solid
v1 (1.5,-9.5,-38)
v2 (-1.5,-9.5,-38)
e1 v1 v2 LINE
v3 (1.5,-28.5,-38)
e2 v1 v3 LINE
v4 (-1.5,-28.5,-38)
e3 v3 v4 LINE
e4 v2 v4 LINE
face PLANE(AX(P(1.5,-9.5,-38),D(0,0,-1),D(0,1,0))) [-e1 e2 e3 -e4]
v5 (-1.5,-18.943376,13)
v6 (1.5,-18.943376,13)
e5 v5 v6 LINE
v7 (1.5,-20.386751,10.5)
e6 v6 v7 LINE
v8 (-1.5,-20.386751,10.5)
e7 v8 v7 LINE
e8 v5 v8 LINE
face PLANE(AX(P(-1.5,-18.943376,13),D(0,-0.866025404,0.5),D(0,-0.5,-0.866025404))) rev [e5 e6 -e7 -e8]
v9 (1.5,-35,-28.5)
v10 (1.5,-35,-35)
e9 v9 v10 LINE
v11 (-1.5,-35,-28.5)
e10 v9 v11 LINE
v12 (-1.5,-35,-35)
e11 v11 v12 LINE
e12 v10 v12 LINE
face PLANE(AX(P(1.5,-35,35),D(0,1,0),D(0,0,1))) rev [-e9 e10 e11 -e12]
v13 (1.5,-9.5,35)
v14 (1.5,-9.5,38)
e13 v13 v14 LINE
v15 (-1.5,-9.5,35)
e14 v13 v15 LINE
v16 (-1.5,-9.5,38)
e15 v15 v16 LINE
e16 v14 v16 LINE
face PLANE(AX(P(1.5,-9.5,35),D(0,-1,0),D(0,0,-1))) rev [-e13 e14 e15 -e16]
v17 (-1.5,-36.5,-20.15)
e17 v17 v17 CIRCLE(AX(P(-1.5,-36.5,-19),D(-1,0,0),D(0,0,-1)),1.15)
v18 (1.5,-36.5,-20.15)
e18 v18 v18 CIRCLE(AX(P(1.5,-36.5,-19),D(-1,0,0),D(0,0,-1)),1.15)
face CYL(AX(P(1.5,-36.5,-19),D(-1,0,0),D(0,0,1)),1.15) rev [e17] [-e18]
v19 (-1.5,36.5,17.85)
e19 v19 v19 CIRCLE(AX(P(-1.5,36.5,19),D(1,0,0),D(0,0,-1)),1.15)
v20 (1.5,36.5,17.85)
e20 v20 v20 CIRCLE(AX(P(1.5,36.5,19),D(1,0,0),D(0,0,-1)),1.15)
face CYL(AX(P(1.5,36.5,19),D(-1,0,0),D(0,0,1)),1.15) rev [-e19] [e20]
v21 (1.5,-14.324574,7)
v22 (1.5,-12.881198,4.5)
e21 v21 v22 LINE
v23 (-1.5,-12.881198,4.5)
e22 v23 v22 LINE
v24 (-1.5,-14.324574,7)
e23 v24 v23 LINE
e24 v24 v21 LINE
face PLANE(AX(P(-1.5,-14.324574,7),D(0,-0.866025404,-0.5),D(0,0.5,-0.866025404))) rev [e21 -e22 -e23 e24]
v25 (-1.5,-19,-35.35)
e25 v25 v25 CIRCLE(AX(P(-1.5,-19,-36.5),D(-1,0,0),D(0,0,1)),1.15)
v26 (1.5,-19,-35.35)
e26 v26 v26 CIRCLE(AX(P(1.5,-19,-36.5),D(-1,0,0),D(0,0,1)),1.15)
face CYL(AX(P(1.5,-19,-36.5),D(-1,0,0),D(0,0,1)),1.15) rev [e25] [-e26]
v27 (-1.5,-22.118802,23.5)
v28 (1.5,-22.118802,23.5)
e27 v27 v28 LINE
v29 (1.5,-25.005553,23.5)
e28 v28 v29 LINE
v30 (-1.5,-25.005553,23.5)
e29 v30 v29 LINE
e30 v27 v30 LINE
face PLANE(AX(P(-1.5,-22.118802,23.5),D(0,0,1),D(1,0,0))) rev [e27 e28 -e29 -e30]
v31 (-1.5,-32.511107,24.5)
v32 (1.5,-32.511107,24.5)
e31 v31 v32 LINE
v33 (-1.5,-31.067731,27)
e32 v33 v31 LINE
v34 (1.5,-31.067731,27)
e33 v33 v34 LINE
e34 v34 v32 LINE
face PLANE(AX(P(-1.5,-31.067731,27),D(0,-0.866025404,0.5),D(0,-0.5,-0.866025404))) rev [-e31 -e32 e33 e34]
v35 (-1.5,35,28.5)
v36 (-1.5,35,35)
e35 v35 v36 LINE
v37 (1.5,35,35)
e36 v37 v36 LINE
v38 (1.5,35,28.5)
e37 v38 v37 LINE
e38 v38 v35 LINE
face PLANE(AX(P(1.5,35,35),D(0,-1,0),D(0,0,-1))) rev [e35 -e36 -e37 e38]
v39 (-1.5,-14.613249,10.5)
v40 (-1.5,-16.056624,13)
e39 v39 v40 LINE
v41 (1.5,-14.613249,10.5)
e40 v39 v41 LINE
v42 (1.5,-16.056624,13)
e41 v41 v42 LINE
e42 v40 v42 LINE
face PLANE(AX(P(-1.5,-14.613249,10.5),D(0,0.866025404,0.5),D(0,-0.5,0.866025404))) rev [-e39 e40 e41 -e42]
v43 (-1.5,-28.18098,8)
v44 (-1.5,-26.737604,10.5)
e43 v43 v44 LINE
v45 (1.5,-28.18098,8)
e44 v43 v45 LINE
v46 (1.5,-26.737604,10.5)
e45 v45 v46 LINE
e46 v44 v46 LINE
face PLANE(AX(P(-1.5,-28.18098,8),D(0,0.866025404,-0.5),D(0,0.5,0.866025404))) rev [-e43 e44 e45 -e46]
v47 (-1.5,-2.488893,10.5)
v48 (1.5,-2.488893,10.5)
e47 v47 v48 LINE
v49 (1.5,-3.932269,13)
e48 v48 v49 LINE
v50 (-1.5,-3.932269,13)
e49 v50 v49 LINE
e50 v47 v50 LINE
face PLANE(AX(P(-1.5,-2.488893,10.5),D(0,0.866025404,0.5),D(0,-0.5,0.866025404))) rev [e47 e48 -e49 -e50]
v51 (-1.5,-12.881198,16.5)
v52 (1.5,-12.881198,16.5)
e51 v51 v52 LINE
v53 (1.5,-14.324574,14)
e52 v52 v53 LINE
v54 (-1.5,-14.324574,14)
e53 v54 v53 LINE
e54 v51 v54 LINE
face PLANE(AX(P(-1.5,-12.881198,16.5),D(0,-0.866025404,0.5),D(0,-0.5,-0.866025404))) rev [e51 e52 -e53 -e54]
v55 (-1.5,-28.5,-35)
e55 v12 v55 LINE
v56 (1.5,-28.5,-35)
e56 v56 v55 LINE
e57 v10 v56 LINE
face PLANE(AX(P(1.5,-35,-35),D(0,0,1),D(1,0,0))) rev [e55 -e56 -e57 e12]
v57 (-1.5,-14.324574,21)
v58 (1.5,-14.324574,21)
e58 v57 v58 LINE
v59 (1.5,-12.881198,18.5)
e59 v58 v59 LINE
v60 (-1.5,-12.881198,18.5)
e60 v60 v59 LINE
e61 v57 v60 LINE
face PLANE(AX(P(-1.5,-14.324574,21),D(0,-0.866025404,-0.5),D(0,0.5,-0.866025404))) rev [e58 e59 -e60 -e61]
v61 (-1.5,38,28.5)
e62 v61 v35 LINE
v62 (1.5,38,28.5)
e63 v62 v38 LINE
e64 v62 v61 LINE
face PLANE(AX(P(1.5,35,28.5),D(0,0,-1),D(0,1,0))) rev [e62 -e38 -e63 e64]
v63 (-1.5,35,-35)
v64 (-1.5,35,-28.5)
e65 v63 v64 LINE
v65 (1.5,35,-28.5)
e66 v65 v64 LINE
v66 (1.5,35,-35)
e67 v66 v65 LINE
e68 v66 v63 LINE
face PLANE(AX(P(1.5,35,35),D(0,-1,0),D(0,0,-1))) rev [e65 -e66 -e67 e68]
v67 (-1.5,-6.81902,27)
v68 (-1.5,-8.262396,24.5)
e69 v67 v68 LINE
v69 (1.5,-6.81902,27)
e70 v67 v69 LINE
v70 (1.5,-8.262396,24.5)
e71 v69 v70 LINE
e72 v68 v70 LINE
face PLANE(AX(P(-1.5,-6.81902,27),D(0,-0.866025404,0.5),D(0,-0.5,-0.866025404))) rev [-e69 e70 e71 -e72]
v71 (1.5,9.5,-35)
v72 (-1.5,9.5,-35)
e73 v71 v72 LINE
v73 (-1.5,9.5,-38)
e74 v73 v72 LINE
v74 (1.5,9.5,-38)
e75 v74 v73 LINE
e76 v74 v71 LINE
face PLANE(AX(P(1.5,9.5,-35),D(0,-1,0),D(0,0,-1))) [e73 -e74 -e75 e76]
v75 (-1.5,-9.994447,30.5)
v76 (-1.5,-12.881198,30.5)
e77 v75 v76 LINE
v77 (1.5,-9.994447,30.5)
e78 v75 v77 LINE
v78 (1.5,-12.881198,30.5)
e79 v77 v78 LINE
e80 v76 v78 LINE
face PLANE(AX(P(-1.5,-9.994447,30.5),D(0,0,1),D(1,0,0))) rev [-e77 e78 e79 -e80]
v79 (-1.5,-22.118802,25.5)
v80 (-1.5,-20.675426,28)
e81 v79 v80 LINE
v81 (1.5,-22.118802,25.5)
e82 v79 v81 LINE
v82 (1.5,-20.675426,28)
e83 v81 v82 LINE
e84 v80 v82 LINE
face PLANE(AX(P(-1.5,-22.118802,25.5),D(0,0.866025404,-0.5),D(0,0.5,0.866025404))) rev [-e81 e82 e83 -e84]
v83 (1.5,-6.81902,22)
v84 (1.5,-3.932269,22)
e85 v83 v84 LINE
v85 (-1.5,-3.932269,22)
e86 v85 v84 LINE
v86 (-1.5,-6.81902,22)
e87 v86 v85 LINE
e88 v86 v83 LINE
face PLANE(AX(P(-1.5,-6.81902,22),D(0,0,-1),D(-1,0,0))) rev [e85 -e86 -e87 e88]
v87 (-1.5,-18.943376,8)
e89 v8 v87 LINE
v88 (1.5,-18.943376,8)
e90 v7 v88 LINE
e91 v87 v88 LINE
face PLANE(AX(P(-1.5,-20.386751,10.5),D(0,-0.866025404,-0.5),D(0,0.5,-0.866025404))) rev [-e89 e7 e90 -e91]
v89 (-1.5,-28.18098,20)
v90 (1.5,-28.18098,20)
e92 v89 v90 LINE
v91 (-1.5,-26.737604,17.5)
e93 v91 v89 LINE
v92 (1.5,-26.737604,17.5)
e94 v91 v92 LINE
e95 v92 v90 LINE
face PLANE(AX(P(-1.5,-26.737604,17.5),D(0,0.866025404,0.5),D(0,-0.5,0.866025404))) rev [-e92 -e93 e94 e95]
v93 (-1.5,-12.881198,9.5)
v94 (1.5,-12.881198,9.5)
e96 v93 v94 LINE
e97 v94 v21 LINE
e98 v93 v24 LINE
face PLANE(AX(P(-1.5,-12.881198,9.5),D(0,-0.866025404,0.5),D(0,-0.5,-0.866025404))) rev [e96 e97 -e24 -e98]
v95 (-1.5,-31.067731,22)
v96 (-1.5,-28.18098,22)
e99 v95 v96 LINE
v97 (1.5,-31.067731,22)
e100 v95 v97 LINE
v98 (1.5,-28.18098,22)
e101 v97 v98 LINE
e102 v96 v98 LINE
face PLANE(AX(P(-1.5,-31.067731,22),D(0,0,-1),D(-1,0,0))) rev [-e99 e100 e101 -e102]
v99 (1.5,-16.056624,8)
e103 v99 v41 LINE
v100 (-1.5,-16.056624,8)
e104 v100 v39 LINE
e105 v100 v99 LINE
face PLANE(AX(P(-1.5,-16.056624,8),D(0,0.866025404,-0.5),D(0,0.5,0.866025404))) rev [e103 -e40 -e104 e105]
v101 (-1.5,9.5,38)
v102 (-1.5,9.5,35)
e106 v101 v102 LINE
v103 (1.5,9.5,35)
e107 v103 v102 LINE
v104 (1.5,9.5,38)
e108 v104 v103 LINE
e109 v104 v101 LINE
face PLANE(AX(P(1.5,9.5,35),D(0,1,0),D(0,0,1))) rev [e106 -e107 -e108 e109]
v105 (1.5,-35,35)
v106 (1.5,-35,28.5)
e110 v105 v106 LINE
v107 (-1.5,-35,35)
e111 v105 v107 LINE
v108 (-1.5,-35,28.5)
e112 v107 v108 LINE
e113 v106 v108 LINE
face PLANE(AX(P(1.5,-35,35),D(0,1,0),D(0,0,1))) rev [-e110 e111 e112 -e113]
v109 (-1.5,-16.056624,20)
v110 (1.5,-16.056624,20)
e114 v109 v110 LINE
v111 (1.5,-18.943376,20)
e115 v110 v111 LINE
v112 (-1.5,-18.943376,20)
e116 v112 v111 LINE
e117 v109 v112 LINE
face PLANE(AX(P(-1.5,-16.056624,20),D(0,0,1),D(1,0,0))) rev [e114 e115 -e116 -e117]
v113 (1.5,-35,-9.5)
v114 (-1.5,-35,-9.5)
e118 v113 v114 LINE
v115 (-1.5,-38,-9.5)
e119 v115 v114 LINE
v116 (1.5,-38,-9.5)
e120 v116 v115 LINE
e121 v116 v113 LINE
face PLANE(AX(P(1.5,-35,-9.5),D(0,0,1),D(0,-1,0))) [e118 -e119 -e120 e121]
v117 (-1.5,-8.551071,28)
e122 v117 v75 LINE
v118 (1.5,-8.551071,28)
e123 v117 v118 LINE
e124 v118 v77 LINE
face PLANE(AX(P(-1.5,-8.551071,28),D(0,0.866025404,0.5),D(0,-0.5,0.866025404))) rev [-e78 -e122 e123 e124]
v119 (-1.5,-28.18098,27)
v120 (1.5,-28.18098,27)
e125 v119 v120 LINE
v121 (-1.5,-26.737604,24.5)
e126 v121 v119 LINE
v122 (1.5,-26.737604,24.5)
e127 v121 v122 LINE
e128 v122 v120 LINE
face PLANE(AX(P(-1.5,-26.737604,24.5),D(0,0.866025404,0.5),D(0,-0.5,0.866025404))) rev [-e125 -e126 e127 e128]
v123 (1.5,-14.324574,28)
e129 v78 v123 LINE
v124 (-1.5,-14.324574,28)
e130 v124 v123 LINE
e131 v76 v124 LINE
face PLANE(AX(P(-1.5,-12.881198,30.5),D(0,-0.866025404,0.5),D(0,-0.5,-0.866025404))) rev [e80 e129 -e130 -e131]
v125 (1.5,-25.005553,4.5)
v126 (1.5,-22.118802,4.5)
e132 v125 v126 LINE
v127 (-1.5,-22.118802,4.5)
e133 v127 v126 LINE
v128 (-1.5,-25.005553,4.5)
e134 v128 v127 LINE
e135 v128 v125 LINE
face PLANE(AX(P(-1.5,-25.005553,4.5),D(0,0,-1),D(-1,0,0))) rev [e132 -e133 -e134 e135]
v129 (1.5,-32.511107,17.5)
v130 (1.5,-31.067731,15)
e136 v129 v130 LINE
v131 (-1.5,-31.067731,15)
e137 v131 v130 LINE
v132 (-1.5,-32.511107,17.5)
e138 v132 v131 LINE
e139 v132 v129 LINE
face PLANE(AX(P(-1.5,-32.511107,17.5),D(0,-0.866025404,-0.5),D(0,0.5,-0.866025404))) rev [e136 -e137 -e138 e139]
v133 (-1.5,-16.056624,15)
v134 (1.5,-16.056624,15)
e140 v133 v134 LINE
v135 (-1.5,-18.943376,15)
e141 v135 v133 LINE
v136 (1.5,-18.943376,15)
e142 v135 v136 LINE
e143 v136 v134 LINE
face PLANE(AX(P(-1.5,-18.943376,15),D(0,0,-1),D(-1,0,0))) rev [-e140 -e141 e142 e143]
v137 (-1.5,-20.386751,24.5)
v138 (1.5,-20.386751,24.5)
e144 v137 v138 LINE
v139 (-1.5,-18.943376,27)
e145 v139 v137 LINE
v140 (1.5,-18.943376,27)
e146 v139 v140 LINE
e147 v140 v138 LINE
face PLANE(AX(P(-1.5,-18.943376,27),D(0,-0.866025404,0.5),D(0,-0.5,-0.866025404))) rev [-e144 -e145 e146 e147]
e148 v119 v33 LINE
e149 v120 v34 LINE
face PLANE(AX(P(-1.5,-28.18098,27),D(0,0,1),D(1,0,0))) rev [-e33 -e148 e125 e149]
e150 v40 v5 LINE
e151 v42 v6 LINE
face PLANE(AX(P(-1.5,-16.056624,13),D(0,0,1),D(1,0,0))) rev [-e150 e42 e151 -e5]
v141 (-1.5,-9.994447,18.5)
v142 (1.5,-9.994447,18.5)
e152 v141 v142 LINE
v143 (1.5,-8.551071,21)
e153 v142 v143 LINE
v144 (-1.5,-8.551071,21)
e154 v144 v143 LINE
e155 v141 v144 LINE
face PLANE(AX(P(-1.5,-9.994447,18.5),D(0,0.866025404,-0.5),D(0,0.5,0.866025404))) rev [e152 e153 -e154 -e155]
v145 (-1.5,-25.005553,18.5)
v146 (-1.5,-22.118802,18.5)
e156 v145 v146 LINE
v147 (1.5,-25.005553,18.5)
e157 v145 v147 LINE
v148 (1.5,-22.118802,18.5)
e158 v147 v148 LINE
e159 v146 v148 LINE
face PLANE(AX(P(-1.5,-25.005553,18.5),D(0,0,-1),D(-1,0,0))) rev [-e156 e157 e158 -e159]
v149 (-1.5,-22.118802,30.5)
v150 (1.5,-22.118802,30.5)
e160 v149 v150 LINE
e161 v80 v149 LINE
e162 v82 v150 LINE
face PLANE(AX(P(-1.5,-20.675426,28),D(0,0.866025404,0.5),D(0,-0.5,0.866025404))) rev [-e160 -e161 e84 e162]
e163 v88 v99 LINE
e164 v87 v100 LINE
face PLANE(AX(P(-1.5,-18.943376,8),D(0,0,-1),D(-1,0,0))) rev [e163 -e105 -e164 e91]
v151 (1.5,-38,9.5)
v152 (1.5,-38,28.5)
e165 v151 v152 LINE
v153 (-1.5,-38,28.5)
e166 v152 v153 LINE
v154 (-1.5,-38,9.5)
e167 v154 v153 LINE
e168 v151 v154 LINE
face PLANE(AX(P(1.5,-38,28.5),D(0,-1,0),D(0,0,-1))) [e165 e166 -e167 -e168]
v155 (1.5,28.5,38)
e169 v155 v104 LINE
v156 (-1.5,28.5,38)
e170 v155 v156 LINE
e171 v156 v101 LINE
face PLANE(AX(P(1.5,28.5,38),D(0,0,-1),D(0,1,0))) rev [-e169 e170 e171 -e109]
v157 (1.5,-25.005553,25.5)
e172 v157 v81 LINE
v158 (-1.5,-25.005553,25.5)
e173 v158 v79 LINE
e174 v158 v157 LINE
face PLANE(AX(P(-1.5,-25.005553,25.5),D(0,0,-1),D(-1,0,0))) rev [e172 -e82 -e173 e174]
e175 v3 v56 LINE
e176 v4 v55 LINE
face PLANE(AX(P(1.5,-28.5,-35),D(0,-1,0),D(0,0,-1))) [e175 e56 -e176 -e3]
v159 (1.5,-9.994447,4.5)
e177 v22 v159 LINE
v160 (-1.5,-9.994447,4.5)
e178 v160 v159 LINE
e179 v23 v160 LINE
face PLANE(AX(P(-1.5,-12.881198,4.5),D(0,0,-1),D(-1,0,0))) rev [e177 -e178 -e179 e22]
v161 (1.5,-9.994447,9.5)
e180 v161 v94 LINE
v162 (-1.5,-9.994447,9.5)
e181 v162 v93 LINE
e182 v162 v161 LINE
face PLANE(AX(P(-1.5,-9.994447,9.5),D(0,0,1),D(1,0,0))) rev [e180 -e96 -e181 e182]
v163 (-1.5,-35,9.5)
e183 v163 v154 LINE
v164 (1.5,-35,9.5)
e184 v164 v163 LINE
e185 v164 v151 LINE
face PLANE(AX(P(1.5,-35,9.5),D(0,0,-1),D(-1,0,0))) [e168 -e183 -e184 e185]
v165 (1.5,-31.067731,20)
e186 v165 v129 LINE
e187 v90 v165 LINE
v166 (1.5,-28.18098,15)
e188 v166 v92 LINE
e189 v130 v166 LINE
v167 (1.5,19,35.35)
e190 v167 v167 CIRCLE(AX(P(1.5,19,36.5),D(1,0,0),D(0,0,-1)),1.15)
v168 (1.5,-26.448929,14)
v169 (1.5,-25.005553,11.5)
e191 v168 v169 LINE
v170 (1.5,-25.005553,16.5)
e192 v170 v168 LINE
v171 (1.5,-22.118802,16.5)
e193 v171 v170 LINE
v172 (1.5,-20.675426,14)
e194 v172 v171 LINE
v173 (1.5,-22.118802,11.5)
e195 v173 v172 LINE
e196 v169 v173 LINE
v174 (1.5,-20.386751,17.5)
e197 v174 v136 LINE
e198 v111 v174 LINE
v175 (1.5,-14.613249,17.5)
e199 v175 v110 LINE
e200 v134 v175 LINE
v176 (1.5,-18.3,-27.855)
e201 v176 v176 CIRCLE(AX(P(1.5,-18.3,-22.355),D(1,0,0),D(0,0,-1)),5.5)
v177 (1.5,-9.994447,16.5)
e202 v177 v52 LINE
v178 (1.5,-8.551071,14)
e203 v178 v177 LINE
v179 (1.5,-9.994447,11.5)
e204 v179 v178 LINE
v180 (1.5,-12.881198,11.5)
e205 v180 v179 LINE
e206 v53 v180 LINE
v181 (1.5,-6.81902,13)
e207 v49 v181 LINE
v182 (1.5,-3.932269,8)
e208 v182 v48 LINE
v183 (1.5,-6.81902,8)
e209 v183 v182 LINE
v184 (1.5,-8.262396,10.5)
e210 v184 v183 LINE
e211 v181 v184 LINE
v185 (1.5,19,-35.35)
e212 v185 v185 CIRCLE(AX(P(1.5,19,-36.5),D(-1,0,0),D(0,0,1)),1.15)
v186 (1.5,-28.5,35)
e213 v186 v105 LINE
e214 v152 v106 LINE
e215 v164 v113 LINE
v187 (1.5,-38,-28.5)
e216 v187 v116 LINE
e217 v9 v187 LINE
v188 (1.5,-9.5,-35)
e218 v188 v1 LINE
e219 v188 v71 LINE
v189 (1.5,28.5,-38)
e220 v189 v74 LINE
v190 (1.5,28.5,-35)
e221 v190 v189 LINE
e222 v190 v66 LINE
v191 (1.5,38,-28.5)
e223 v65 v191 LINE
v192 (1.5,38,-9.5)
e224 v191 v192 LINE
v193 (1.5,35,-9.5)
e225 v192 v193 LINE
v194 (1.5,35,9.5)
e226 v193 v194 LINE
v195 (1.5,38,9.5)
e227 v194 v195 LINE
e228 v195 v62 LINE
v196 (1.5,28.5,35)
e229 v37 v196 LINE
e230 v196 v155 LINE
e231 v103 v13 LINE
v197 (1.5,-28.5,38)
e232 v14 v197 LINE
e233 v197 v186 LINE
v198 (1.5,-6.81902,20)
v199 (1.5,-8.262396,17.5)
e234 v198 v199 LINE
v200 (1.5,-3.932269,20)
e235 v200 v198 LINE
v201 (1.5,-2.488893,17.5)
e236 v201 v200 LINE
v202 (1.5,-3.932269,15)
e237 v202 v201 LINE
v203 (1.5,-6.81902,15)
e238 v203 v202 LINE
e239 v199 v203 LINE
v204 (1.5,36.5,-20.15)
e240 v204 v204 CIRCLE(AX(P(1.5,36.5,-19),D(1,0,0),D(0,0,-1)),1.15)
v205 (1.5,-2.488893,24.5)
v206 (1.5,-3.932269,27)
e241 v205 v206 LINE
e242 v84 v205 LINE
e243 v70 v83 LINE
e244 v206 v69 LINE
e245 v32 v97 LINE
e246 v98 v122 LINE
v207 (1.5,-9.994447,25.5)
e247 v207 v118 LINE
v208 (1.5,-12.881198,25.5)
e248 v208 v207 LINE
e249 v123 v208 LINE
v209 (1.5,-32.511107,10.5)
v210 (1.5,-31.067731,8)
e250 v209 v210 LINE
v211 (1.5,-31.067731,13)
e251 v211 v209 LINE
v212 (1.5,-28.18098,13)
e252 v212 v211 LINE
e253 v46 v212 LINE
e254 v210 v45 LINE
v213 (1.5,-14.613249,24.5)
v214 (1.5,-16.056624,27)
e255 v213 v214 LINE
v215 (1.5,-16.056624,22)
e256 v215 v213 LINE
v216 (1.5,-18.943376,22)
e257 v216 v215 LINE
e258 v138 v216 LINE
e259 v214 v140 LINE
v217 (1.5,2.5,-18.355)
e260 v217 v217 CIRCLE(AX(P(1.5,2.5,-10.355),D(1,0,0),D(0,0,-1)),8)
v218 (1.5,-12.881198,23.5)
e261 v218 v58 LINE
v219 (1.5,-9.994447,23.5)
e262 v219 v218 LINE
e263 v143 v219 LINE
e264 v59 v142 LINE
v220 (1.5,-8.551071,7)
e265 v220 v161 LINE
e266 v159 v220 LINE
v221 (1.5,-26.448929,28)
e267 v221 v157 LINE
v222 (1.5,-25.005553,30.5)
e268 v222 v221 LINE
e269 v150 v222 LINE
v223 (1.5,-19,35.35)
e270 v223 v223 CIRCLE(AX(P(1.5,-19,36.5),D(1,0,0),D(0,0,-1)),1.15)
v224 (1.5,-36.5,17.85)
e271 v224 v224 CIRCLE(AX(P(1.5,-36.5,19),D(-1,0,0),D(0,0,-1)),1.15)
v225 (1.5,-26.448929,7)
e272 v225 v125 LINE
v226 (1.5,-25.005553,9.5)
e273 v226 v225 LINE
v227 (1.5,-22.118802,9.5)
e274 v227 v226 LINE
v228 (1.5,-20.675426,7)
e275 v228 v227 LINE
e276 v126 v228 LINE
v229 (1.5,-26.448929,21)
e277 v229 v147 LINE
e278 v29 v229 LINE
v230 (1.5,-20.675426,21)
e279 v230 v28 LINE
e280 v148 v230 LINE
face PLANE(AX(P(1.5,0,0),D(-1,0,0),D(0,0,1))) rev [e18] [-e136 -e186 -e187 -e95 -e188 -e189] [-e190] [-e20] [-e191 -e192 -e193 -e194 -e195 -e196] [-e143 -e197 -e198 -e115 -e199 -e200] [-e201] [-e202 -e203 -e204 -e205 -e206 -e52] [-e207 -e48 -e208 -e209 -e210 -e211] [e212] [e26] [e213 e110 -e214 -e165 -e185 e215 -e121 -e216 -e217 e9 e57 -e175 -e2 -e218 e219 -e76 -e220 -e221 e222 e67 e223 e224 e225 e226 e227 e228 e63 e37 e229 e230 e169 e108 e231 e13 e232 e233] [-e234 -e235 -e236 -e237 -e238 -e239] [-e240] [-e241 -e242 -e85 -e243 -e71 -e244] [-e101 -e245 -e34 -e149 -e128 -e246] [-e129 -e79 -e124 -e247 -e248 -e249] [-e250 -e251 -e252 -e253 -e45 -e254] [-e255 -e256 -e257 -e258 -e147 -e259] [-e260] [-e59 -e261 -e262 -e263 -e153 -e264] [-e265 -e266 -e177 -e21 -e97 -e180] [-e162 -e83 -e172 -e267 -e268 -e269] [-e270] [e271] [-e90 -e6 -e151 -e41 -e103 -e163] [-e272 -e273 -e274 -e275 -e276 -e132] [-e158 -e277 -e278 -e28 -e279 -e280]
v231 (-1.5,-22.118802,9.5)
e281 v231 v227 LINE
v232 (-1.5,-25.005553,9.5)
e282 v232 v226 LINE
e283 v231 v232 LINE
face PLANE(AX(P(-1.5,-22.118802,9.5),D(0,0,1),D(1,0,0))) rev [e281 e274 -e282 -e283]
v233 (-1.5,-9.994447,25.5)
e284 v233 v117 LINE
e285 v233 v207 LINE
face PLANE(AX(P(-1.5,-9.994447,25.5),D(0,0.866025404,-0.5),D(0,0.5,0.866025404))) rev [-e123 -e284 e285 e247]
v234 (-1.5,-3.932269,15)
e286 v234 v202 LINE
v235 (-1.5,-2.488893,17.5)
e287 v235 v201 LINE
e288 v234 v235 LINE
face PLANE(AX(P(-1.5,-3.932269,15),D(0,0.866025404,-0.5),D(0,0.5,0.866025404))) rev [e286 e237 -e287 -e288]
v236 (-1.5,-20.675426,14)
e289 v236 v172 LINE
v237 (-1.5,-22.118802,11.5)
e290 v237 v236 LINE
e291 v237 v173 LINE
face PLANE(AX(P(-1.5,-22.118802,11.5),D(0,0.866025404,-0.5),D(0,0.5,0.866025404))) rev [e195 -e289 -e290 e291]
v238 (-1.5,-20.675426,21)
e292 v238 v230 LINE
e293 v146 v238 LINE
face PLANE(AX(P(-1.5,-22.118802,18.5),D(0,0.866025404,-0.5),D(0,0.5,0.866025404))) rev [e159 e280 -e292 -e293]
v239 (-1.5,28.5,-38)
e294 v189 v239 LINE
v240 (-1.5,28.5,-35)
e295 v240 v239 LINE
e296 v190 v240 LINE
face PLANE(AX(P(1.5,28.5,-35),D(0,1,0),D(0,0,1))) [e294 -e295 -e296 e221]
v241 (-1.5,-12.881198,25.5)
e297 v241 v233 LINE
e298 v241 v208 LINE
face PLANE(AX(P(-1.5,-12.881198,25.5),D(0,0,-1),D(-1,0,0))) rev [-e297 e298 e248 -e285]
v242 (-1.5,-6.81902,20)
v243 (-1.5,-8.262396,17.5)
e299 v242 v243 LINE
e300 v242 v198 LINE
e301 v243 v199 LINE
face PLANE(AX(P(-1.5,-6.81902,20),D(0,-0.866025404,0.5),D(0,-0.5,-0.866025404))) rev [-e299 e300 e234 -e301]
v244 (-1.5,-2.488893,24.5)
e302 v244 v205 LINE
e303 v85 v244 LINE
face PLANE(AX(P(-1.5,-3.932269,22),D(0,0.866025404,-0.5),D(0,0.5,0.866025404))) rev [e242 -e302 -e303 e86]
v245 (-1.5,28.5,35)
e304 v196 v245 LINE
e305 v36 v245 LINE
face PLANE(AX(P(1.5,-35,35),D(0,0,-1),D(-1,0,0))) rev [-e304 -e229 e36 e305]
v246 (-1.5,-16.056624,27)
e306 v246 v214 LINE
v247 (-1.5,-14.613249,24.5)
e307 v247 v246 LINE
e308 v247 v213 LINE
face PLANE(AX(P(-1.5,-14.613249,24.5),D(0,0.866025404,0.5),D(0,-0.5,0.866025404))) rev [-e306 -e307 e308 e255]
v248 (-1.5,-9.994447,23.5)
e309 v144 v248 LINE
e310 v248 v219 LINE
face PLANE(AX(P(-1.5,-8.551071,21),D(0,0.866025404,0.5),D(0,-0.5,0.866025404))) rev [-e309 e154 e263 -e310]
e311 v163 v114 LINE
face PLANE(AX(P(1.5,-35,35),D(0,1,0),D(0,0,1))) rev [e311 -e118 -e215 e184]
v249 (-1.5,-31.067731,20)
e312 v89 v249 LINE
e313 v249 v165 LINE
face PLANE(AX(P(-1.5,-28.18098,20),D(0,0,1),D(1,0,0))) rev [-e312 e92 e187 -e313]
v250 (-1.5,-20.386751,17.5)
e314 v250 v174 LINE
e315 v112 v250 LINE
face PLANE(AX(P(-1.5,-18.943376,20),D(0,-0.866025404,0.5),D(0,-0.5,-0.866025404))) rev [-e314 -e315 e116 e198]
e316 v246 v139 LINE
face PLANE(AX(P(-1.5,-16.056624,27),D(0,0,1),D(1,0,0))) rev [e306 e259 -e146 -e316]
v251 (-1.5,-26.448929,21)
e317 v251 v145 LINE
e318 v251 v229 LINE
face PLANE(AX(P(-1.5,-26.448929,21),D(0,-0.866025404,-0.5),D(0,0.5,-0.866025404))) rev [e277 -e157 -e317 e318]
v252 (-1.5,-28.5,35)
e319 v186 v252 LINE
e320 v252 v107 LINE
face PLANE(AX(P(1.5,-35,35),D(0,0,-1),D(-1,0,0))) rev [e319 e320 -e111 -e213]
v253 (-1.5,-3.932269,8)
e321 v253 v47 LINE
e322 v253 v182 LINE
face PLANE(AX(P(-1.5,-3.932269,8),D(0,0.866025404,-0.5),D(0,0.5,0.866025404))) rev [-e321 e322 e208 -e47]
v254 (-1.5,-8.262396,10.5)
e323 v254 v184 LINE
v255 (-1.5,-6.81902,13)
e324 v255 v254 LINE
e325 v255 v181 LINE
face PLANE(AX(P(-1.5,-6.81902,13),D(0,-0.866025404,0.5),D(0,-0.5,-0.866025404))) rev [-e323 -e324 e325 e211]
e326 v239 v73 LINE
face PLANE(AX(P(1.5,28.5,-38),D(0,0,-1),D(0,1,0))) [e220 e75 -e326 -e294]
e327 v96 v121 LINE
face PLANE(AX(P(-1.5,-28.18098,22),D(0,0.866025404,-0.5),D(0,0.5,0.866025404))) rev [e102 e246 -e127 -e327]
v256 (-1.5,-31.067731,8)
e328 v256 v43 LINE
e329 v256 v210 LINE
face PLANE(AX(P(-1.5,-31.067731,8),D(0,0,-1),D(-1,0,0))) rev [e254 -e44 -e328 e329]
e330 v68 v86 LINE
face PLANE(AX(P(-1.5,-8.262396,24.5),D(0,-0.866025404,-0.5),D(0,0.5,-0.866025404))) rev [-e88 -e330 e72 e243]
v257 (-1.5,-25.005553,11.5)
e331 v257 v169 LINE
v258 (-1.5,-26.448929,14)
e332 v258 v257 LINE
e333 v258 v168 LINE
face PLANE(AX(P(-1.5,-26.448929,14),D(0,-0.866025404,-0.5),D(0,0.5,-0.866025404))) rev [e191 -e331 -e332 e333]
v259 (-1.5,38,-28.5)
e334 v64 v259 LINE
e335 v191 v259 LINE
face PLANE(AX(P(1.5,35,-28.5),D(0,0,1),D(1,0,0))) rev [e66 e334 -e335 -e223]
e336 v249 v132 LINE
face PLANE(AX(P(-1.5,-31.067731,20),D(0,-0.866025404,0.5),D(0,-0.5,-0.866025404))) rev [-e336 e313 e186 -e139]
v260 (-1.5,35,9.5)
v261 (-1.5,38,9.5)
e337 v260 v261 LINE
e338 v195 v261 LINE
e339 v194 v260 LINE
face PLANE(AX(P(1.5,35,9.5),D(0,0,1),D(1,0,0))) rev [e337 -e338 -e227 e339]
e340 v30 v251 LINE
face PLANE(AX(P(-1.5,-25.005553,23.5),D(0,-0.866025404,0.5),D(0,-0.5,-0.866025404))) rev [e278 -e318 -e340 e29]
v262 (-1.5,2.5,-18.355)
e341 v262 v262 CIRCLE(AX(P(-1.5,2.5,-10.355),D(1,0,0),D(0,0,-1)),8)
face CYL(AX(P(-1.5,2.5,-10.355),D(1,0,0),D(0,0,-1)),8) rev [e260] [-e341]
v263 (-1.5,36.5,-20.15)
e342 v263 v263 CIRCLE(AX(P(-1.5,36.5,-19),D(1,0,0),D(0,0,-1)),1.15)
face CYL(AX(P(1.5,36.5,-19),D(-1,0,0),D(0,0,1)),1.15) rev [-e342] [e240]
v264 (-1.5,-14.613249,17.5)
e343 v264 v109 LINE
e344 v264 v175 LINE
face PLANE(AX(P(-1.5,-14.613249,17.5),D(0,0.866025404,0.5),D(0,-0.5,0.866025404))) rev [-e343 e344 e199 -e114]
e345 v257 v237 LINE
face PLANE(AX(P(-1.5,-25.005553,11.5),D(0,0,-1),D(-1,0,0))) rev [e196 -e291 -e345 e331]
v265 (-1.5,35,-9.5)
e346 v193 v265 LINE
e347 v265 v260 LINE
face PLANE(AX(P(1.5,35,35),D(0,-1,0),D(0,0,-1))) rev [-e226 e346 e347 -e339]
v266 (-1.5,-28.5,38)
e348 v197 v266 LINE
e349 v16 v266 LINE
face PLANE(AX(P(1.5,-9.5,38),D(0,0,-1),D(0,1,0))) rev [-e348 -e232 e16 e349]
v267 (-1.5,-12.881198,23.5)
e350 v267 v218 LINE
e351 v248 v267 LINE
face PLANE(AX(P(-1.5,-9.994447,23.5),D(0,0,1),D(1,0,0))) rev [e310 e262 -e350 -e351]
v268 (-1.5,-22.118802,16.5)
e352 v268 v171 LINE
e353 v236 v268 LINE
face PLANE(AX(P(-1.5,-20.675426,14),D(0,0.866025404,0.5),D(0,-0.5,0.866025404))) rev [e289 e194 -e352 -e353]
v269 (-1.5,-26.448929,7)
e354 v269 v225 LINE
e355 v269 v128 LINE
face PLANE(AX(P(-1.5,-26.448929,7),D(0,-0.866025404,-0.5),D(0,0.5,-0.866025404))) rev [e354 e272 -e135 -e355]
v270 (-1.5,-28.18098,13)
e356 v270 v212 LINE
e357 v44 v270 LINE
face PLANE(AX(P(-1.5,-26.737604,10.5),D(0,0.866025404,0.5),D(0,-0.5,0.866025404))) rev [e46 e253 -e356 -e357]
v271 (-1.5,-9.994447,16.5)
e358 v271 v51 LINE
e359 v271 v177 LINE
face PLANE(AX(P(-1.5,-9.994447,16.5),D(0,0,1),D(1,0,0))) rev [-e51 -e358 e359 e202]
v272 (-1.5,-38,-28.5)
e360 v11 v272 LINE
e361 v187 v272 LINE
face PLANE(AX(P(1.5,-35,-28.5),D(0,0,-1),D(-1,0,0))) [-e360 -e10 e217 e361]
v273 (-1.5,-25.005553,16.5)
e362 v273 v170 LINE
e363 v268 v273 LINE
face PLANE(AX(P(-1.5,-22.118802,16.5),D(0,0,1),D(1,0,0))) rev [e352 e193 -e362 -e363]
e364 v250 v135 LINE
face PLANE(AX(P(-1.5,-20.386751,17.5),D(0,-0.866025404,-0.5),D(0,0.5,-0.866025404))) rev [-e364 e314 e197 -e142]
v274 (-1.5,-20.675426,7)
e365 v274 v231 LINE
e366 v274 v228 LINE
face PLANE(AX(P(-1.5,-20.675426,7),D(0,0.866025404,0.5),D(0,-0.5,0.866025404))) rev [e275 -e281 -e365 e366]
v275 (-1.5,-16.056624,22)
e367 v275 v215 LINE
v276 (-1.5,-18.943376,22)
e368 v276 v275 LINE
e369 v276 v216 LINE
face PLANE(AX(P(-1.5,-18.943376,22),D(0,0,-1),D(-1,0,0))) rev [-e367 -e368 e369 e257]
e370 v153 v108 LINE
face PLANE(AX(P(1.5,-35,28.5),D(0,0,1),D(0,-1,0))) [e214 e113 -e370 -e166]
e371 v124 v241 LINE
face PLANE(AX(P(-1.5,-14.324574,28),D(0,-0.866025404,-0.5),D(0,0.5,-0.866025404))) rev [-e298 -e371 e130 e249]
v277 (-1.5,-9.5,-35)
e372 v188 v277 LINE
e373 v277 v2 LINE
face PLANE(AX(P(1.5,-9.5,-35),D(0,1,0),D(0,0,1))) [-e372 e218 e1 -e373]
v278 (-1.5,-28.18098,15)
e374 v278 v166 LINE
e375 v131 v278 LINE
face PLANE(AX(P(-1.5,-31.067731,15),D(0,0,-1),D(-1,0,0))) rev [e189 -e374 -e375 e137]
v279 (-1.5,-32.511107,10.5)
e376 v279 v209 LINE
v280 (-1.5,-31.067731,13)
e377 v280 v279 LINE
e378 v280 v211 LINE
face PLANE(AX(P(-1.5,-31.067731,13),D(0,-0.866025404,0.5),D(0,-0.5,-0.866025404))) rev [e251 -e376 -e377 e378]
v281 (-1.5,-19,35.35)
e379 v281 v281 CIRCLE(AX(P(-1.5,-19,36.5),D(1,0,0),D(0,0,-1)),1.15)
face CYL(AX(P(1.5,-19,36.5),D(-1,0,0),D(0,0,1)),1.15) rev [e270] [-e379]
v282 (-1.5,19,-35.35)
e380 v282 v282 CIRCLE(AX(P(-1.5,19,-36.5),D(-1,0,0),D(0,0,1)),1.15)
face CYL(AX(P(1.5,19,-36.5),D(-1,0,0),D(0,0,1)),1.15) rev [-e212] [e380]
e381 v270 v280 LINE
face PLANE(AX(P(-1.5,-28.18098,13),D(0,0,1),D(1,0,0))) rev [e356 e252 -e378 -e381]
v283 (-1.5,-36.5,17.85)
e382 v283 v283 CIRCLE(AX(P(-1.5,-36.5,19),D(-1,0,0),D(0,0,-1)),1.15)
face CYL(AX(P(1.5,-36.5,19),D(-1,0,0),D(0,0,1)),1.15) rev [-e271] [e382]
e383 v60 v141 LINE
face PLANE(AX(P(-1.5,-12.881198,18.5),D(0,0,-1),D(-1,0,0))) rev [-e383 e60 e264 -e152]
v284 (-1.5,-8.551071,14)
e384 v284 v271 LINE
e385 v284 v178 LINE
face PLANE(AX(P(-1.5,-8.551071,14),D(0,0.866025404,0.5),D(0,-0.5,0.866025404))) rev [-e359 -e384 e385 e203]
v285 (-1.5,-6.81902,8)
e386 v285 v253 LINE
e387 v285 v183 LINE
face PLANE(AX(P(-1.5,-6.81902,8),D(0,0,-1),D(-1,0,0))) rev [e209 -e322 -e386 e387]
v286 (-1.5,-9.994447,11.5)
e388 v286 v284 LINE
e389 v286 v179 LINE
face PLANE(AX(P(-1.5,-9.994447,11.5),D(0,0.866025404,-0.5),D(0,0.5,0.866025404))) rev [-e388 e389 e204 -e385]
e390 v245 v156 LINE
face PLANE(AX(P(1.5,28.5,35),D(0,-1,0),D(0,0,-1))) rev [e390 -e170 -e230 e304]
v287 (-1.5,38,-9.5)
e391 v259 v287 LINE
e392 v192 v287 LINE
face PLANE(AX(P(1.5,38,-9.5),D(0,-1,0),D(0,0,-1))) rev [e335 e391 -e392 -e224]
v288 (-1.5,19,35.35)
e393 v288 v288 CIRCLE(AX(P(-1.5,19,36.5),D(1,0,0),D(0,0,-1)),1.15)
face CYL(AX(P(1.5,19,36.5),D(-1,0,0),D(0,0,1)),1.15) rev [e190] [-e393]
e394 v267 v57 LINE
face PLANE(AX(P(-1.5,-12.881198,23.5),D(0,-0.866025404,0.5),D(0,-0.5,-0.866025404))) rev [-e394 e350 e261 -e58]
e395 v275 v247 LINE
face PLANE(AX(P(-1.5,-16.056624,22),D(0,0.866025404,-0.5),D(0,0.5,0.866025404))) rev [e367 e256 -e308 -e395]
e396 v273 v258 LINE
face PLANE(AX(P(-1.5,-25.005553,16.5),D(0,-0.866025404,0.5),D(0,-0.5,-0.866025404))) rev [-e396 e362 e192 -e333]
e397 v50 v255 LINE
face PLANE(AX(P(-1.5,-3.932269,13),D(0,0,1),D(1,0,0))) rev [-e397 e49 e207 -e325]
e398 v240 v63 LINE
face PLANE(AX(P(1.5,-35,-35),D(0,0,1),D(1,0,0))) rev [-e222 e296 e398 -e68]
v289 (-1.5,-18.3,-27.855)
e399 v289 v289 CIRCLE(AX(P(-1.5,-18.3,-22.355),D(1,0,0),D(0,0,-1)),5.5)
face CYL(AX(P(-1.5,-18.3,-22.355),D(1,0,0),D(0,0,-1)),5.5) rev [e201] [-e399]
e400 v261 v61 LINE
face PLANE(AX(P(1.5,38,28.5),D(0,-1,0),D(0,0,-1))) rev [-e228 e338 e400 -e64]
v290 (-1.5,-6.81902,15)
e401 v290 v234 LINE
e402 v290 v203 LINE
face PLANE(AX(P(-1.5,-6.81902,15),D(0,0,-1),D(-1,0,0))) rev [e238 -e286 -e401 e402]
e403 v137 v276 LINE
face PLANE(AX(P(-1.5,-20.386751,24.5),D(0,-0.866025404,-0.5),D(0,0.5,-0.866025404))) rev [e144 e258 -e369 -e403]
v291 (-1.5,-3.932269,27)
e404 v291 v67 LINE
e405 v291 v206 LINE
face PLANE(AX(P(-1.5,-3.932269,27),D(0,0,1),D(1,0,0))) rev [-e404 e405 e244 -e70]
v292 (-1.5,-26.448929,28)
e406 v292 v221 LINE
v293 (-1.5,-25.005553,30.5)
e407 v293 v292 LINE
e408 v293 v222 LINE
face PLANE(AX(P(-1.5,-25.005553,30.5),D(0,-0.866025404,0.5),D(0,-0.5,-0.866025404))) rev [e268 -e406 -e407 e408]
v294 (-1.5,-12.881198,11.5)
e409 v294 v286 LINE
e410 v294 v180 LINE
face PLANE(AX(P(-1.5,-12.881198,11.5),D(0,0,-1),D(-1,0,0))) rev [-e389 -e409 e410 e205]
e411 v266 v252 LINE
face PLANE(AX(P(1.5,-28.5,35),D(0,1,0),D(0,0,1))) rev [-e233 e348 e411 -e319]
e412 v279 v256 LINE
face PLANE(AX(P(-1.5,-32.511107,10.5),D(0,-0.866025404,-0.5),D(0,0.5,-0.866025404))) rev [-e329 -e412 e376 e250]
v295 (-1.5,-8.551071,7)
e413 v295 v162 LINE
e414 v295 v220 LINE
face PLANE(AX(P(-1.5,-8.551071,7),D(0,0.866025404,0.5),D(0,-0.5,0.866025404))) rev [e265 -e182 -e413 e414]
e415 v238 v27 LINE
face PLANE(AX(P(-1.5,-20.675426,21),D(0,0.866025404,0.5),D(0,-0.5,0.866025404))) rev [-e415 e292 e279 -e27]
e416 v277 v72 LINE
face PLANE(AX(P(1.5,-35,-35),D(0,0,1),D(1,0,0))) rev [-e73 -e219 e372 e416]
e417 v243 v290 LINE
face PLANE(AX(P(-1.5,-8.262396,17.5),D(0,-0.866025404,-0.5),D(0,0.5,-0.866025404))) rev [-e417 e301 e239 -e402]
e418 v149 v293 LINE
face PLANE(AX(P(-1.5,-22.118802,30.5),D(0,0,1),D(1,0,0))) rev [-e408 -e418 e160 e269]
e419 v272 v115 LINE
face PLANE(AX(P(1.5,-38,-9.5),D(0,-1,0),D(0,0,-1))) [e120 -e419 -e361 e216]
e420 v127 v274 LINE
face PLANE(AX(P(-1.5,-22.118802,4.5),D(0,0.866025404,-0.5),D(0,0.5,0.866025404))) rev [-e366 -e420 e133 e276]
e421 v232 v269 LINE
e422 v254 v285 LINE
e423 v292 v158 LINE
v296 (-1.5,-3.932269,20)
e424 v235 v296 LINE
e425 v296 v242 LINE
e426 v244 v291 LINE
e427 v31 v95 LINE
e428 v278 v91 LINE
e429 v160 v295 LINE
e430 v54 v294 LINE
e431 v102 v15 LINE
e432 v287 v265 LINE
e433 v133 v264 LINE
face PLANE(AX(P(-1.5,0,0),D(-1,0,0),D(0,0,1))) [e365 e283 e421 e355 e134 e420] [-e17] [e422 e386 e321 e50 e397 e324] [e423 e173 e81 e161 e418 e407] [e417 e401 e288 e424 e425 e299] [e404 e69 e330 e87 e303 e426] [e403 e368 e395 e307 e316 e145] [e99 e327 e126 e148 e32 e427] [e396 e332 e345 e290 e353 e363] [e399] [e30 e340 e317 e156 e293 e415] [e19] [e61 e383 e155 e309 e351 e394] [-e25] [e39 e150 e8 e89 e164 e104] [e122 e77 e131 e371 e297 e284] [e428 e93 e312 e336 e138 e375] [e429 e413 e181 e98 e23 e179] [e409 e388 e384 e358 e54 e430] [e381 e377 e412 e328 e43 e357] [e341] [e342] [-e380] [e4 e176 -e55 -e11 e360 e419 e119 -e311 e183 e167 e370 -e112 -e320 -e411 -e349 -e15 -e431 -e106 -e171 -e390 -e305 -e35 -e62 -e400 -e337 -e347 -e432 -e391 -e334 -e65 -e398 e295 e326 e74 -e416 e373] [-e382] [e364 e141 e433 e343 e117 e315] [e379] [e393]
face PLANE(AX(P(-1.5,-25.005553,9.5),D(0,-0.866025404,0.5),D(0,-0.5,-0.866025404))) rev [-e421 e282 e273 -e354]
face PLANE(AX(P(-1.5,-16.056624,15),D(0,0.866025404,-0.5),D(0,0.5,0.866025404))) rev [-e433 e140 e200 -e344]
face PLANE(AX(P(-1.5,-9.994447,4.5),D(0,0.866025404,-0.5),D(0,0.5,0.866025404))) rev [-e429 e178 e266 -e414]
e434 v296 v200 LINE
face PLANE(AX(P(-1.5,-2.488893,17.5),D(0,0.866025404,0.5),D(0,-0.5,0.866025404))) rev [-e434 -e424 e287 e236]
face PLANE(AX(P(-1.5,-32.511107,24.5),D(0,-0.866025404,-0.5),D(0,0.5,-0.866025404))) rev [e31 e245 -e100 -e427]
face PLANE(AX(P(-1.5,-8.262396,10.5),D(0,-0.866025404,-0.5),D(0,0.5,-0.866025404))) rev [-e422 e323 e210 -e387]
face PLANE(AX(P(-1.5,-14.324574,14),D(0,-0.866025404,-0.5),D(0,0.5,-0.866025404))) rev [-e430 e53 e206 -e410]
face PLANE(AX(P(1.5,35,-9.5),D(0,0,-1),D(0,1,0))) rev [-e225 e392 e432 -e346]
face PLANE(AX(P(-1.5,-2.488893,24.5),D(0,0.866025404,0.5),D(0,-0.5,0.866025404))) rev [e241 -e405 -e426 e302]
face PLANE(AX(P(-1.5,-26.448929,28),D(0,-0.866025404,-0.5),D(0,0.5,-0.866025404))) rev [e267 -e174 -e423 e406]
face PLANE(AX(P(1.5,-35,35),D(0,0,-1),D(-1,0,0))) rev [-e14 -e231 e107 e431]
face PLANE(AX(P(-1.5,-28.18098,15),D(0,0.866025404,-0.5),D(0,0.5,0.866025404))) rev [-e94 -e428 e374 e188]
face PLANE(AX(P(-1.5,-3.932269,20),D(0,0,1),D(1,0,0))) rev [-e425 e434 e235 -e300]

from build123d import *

# Parameters (mm, degrees)
CROQUIS1_W                 = 70
CROQUIS1_H                 = 70
SALIENTE_EXTRUIR1_DEPTH    = 1.5
CROQUIS2_W                 = 19
CROQUIS2_H                 = 3
CROQUIS2_R                 = 1.15
SALIENTE_EXTRUIR2_DEPTH    = 1.5
MATRIZL1_COUNT             = 2
MATRIZL1_PITCH             = 38
SIMETR_A1_COPY_1_SKETCH_W  = 19
SIMETR_A1_COPY_1_SKETCH_H  = 3
SIMETR_A1_COPY_1_SKETCH_R  = 1.15
SIMETR_A1_COPY_1_DEPTH     = 1.5
CROQUIS5_W                 = 3
CROQUIS5_H                 = 19
CROQUIS5_R                 = 1.15
SALIENTE_EXTRUIR3_DEPTH    = 1.5
MATRIZL2_COUNT             = 2
MATRIZL2_PITCH             = 38
SIMETR_A2_COPY_1_SKETCH_W  = 3
SIMETR_A2_COPY_1_SKETCH_H  = 19
SIMETR_A2_COPY_1_SKETCH_R  = 1.15
SIMETR_A2_COPY_1_DEPTH     = 1.5
CORTAR_EXTRUIR2_DEPTH      = 54.761045377
CORTAR_EXTRUIR2_DEPTH_BACK = 54.761045377
CROQUIS4_R                 = 5.5
CORTAR_EXTRUIR3_DEPTH      = 54.761045377
CORTAR_EXTRUIR3_DEPTH_BACK = 54.761045377
CROQUIS6_R                 = 8
CORTAR_EXTRUIR7_DEPTH      = 54.761045377
CORTAR_EXTRUIR7_DEPTH_BACK = 54.761045377
PATR_N_START               = -1.5
PATR_N_DE_RAYADO3_DEPTH    = 3


# Read off the part's stored shape, not the designer's step: Patrón de rayado3
with BuildPart() as part:
    # Croquis1 → Saliente-Extruir1 (new, symmetric)
    with BuildSketch(Plane(origin=(0, 0, 0), x_dir=(0, 0, -1), z_dir=(1, 0, 0))):
        Rectangle(CROQUIS1_W, CROQUIS1_H)
    extrude(amount=SALIENTE_EXTRUIR1_DEPTH, both=True)

    # Croquis2 → Saliente-Extruir2 (add, symmetric)
    with BuildSketch(Plane(origin=(0, 0, 0), x_dir=(0, 0, -1), z_dir=(1, 0, 0))):
        with Locations((-19, 36.5)):
            Rectangle(CROQUIS2_W, CROQUIS2_H)
        with Locations((-19, 36.5)):
            Circle(CROQUIS2_R, mode=Mode.SUBTRACT)
    saliente_extruir2 = extrude(amount=SALIENTE_EXTRUIR2_DEPTH, both=True)

    # MatrizL1: Saliente-Extruir2 ×2
    with Locations(*[(0, 0, -i * MATRIZL1_PITCH) for i in range(1, MATRIZL1_COUNT)]):
        add(saliente_extruir2)

    # Simetría1: Saliente-Extruir2 across plane
    add(saliente_extruir2.mirror(Plane.ZX))

    # Simetría1 copy 1 sketch → Simetría1 copy 1 (add, symmetric)
    with BuildSketch(Plane(origin=(0, 0, -38), x_dir=(0, 0, -1), z_dir=(1, 0, 0))):
        with Locations((-19, -36.5)):
            Rectangle(SIMETR_A1_COPY_1_SKETCH_W, SIMETR_A1_COPY_1_SKETCH_H)
        with Locations((-19, -36.5)):
            Circle(SIMETR_A1_COPY_1_SKETCH_R, mode=Mode.SUBTRACT)
    extrude(amount=SIMETR_A1_COPY_1_DEPTH, both=True)

    # Croquis5 → Saliente-Extruir3 (add, symmetric)
    with BuildSketch(Plane(origin=(0, 0, 0), x_dir=(0, 0, -1), z_dir=(1, 0, 0))):
        with Locations((-36.5, 19)):
            Rectangle(CROQUIS5_W, CROQUIS5_H)
        with Locations((-36.5, 19)):
            Circle(CROQUIS5_R, mode=Mode.SUBTRACT)
    saliente_extruir3 = extrude(amount=SALIENTE_EXTRUIR3_DEPTH, both=True)

    # MatrizL2: Saliente-Extruir3 ×2
    with Locations(*[(0, -i * MATRIZL2_PITCH, 0) for i in range(1, MATRIZL2_COUNT)]):
        add(saliente_extruir3)

    # Simetría2: Saliente-Extruir3 across plane
    add(saliente_extruir3.mirror(Plane.XY))

    # Simetría2 copy 1 sketch → Simetría2 copy 1 (add, symmetric)
    with BuildSketch(Plane(origin=(0, -38, 0), x_dir=(0, 0, 1), z_dir=(1, 0, 0))):
        with Locations((-36.5, -19)):
            Rectangle(SIMETR_A2_COPY_1_SKETCH_W, SIMETR_A2_COPY_1_SKETCH_H)
        with Locations((-36.5, -19)):
            Circle(SIMETR_A2_COPY_1_SKETCH_R, mode=Mode.SUBTRACT)
    extrude(amount=SIMETR_A2_COPY_1_DEPTH, both=True)

    # Croquis4 → Cortar-Extruir2 (cut, two sides: drawn at the far end of the back side and taken through both)
    with BuildSketch(Plane(origin=(0, 0, 0), x_dir=(0, 0, -1), z_dir=(1, 0, 0)).offset(-CORTAR_EXTRUIR2_DEPTH_BACK)):
        with Locations((22.355, -18.3)):
            Circle(CROQUIS4_R)
    extrude(amount=CORTAR_EXTRUIR2_DEPTH + CORTAR_EXTRUIR2_DEPTH_BACK, mode=Mode.SUBTRACT)

    # Croquis6 → Cortar-Extruir3 (cut, two sides: drawn at the far end of the back side and taken through both)
    with BuildSketch(Plane(origin=(0, 0, 0), x_dir=(0, 0, -1), z_dir=(1, 0, 0)).offset(-CORTAR_EXTRUIR3_DEPTH_BACK)):
        with Locations((10.355, 2.5)):
            Circle(CROQUIS6_R)
    extrude(amount=CORTAR_EXTRUIR3_DEPTH + CORTAR_EXTRUIR3_DEPTH_BACK, mode=Mode.SUBTRACT)

    # Croquis11 → Cortar-Extruir7 (cut, two sides: drawn at the far end of the back side and taken through both)
    with BuildSketch(Plane(origin=(0, 0, 0), x_dir=(0, 0, -1), z_dir=(1, 0, 0)).offset(-CORTAR_EXTRUIR7_DEPTH_BACK)):
        Polygon((-20, -16.056624327), (-20, -18.943375673), (-17.5, -20.386751346), (-15, -18.943375673), (-15, -16.056624327), (-17.5, -14.613248654), align=None)
    extrude(amount=CORTAR_EXTRUIR7_DEPTH + CORTAR_EXTRUIR7_DEPTH_BACK, mode=Mode.SUBTRACT)

    # Patrón de rayado3 outline → Patrón de rayado3 (cut)
    with BuildSketch(Plane.YZ.offset(PATR_N_START)):
        Polygon((-20.675426481, 7), (-22.118802154, 9.5), (-25.005553499, 9.5), (-26.448929172, 7), (-25.005553499, 4.5), (-22.118802154, 4.5), align=None)
        Polygon((-8.551070828, 7), (-9.994446501, 9.5), (-12.881197846, 9.5), (-14.324573519, 7), (-12.881197846, 4.5), (-9.994446501, 4.5), align=None)
        Polygon((-22.118802154, 25.5), (-20.675426481, 28), (-22.118802154, 30.5), (-25.005553499, 30.5), (-26.448929172, 28), (-25.005553499, 25.5), align=None)
        Polygon((-12.881197846, 25.5), (-9.994446501, 25.5), (-8.551070828, 28), (-9.994446501, 30.5), (-12.881197846, 30.5), (-14.324573519, 28), align=None)
        Polygon((-32.511106999, 17.5), (-31.067731326, 15), (-28.18097998, 15), (-26.737604307, 17.5), (-28.18097998, 20), (-31.067731326, 20), align=None)
        Polygon((-8.262395693, 17.5), (-6.81902002, 15), (-3.932268674, 15), (-2.488893001, 17.5), (-3.932268674, 20), (-6.81902002, 20), align=None)
        Polygon((-16.056624327, 8), (-14.613248654, 10.5), (-16.056624327, 13), (-18.943375673, 13), (-20.386751346, 10.5), (-18.943375673, 8), align=None)
        Polygon((-22.118802154, 18.5), (-20.675426481, 21), (-22.118802154, 23.5), (-25.005553499, 23.5), (-26.448929172, 21), (-25.005553499, 18.5), align=None)
        Polygon((-12.881197846, 18.5), (-9.994446501, 18.5), (-8.551070828, 21), (-9.994446501, 23.5), (-12.881197846, 23.5), (-14.324573519, 21), align=None)
        Polygon((-8.262395693, 10.5), (-6.81902002, 8), (-3.932268674, 8), (-2.488893001, 10.5), (-3.932268674, 13), (-6.81902002, 13), align=None)
        Polygon((-32.511106999, 10.5), (-31.067731326, 8), (-28.18097998, 8), (-26.737604307, 10.5), (-28.18097998, 13), (-31.067731326, 13), align=None)
        Polygon((-22.118802154, 11.5), (-20.675426481, 14), (-22.118802154, 16.5), (-25.005553499, 16.5), (-26.448929172, 14), (-25.005553499, 11.5), align=None)
        Polygon((-28.18097998, 22), (-26.737604307, 24.5), (-28.18097998, 27), (-31.067731326, 27), (-32.511106999, 24.5), (-31.067731326, 22), align=None)
        Polygon((-18.943375673, 22), (-16.056624327, 22), (-14.613248654, 24.5), (-16.056624327, 27), (-18.943375673, 27), (-20.386751346, 24.5), align=None)
        Polygon((-14.324573519, 14), (-12.881197846, 11.5), (-9.994446501, 11.5), (-8.551070828, 14), (-9.994446501, 16.5), (-12.881197846, 16.5), align=None)
        Polygon((-8.262395693, 24.5), (-6.81902002, 22), (-3.932268674, 22), (-2.488893001, 24.5), (-3.932268674, 27), (-6.81902002, 27), align=None)
    extrude(amount=PATR_N_DE_RAYADO3_DEPTH, mode=Mode.SUBTRACT)


solid = part.part
